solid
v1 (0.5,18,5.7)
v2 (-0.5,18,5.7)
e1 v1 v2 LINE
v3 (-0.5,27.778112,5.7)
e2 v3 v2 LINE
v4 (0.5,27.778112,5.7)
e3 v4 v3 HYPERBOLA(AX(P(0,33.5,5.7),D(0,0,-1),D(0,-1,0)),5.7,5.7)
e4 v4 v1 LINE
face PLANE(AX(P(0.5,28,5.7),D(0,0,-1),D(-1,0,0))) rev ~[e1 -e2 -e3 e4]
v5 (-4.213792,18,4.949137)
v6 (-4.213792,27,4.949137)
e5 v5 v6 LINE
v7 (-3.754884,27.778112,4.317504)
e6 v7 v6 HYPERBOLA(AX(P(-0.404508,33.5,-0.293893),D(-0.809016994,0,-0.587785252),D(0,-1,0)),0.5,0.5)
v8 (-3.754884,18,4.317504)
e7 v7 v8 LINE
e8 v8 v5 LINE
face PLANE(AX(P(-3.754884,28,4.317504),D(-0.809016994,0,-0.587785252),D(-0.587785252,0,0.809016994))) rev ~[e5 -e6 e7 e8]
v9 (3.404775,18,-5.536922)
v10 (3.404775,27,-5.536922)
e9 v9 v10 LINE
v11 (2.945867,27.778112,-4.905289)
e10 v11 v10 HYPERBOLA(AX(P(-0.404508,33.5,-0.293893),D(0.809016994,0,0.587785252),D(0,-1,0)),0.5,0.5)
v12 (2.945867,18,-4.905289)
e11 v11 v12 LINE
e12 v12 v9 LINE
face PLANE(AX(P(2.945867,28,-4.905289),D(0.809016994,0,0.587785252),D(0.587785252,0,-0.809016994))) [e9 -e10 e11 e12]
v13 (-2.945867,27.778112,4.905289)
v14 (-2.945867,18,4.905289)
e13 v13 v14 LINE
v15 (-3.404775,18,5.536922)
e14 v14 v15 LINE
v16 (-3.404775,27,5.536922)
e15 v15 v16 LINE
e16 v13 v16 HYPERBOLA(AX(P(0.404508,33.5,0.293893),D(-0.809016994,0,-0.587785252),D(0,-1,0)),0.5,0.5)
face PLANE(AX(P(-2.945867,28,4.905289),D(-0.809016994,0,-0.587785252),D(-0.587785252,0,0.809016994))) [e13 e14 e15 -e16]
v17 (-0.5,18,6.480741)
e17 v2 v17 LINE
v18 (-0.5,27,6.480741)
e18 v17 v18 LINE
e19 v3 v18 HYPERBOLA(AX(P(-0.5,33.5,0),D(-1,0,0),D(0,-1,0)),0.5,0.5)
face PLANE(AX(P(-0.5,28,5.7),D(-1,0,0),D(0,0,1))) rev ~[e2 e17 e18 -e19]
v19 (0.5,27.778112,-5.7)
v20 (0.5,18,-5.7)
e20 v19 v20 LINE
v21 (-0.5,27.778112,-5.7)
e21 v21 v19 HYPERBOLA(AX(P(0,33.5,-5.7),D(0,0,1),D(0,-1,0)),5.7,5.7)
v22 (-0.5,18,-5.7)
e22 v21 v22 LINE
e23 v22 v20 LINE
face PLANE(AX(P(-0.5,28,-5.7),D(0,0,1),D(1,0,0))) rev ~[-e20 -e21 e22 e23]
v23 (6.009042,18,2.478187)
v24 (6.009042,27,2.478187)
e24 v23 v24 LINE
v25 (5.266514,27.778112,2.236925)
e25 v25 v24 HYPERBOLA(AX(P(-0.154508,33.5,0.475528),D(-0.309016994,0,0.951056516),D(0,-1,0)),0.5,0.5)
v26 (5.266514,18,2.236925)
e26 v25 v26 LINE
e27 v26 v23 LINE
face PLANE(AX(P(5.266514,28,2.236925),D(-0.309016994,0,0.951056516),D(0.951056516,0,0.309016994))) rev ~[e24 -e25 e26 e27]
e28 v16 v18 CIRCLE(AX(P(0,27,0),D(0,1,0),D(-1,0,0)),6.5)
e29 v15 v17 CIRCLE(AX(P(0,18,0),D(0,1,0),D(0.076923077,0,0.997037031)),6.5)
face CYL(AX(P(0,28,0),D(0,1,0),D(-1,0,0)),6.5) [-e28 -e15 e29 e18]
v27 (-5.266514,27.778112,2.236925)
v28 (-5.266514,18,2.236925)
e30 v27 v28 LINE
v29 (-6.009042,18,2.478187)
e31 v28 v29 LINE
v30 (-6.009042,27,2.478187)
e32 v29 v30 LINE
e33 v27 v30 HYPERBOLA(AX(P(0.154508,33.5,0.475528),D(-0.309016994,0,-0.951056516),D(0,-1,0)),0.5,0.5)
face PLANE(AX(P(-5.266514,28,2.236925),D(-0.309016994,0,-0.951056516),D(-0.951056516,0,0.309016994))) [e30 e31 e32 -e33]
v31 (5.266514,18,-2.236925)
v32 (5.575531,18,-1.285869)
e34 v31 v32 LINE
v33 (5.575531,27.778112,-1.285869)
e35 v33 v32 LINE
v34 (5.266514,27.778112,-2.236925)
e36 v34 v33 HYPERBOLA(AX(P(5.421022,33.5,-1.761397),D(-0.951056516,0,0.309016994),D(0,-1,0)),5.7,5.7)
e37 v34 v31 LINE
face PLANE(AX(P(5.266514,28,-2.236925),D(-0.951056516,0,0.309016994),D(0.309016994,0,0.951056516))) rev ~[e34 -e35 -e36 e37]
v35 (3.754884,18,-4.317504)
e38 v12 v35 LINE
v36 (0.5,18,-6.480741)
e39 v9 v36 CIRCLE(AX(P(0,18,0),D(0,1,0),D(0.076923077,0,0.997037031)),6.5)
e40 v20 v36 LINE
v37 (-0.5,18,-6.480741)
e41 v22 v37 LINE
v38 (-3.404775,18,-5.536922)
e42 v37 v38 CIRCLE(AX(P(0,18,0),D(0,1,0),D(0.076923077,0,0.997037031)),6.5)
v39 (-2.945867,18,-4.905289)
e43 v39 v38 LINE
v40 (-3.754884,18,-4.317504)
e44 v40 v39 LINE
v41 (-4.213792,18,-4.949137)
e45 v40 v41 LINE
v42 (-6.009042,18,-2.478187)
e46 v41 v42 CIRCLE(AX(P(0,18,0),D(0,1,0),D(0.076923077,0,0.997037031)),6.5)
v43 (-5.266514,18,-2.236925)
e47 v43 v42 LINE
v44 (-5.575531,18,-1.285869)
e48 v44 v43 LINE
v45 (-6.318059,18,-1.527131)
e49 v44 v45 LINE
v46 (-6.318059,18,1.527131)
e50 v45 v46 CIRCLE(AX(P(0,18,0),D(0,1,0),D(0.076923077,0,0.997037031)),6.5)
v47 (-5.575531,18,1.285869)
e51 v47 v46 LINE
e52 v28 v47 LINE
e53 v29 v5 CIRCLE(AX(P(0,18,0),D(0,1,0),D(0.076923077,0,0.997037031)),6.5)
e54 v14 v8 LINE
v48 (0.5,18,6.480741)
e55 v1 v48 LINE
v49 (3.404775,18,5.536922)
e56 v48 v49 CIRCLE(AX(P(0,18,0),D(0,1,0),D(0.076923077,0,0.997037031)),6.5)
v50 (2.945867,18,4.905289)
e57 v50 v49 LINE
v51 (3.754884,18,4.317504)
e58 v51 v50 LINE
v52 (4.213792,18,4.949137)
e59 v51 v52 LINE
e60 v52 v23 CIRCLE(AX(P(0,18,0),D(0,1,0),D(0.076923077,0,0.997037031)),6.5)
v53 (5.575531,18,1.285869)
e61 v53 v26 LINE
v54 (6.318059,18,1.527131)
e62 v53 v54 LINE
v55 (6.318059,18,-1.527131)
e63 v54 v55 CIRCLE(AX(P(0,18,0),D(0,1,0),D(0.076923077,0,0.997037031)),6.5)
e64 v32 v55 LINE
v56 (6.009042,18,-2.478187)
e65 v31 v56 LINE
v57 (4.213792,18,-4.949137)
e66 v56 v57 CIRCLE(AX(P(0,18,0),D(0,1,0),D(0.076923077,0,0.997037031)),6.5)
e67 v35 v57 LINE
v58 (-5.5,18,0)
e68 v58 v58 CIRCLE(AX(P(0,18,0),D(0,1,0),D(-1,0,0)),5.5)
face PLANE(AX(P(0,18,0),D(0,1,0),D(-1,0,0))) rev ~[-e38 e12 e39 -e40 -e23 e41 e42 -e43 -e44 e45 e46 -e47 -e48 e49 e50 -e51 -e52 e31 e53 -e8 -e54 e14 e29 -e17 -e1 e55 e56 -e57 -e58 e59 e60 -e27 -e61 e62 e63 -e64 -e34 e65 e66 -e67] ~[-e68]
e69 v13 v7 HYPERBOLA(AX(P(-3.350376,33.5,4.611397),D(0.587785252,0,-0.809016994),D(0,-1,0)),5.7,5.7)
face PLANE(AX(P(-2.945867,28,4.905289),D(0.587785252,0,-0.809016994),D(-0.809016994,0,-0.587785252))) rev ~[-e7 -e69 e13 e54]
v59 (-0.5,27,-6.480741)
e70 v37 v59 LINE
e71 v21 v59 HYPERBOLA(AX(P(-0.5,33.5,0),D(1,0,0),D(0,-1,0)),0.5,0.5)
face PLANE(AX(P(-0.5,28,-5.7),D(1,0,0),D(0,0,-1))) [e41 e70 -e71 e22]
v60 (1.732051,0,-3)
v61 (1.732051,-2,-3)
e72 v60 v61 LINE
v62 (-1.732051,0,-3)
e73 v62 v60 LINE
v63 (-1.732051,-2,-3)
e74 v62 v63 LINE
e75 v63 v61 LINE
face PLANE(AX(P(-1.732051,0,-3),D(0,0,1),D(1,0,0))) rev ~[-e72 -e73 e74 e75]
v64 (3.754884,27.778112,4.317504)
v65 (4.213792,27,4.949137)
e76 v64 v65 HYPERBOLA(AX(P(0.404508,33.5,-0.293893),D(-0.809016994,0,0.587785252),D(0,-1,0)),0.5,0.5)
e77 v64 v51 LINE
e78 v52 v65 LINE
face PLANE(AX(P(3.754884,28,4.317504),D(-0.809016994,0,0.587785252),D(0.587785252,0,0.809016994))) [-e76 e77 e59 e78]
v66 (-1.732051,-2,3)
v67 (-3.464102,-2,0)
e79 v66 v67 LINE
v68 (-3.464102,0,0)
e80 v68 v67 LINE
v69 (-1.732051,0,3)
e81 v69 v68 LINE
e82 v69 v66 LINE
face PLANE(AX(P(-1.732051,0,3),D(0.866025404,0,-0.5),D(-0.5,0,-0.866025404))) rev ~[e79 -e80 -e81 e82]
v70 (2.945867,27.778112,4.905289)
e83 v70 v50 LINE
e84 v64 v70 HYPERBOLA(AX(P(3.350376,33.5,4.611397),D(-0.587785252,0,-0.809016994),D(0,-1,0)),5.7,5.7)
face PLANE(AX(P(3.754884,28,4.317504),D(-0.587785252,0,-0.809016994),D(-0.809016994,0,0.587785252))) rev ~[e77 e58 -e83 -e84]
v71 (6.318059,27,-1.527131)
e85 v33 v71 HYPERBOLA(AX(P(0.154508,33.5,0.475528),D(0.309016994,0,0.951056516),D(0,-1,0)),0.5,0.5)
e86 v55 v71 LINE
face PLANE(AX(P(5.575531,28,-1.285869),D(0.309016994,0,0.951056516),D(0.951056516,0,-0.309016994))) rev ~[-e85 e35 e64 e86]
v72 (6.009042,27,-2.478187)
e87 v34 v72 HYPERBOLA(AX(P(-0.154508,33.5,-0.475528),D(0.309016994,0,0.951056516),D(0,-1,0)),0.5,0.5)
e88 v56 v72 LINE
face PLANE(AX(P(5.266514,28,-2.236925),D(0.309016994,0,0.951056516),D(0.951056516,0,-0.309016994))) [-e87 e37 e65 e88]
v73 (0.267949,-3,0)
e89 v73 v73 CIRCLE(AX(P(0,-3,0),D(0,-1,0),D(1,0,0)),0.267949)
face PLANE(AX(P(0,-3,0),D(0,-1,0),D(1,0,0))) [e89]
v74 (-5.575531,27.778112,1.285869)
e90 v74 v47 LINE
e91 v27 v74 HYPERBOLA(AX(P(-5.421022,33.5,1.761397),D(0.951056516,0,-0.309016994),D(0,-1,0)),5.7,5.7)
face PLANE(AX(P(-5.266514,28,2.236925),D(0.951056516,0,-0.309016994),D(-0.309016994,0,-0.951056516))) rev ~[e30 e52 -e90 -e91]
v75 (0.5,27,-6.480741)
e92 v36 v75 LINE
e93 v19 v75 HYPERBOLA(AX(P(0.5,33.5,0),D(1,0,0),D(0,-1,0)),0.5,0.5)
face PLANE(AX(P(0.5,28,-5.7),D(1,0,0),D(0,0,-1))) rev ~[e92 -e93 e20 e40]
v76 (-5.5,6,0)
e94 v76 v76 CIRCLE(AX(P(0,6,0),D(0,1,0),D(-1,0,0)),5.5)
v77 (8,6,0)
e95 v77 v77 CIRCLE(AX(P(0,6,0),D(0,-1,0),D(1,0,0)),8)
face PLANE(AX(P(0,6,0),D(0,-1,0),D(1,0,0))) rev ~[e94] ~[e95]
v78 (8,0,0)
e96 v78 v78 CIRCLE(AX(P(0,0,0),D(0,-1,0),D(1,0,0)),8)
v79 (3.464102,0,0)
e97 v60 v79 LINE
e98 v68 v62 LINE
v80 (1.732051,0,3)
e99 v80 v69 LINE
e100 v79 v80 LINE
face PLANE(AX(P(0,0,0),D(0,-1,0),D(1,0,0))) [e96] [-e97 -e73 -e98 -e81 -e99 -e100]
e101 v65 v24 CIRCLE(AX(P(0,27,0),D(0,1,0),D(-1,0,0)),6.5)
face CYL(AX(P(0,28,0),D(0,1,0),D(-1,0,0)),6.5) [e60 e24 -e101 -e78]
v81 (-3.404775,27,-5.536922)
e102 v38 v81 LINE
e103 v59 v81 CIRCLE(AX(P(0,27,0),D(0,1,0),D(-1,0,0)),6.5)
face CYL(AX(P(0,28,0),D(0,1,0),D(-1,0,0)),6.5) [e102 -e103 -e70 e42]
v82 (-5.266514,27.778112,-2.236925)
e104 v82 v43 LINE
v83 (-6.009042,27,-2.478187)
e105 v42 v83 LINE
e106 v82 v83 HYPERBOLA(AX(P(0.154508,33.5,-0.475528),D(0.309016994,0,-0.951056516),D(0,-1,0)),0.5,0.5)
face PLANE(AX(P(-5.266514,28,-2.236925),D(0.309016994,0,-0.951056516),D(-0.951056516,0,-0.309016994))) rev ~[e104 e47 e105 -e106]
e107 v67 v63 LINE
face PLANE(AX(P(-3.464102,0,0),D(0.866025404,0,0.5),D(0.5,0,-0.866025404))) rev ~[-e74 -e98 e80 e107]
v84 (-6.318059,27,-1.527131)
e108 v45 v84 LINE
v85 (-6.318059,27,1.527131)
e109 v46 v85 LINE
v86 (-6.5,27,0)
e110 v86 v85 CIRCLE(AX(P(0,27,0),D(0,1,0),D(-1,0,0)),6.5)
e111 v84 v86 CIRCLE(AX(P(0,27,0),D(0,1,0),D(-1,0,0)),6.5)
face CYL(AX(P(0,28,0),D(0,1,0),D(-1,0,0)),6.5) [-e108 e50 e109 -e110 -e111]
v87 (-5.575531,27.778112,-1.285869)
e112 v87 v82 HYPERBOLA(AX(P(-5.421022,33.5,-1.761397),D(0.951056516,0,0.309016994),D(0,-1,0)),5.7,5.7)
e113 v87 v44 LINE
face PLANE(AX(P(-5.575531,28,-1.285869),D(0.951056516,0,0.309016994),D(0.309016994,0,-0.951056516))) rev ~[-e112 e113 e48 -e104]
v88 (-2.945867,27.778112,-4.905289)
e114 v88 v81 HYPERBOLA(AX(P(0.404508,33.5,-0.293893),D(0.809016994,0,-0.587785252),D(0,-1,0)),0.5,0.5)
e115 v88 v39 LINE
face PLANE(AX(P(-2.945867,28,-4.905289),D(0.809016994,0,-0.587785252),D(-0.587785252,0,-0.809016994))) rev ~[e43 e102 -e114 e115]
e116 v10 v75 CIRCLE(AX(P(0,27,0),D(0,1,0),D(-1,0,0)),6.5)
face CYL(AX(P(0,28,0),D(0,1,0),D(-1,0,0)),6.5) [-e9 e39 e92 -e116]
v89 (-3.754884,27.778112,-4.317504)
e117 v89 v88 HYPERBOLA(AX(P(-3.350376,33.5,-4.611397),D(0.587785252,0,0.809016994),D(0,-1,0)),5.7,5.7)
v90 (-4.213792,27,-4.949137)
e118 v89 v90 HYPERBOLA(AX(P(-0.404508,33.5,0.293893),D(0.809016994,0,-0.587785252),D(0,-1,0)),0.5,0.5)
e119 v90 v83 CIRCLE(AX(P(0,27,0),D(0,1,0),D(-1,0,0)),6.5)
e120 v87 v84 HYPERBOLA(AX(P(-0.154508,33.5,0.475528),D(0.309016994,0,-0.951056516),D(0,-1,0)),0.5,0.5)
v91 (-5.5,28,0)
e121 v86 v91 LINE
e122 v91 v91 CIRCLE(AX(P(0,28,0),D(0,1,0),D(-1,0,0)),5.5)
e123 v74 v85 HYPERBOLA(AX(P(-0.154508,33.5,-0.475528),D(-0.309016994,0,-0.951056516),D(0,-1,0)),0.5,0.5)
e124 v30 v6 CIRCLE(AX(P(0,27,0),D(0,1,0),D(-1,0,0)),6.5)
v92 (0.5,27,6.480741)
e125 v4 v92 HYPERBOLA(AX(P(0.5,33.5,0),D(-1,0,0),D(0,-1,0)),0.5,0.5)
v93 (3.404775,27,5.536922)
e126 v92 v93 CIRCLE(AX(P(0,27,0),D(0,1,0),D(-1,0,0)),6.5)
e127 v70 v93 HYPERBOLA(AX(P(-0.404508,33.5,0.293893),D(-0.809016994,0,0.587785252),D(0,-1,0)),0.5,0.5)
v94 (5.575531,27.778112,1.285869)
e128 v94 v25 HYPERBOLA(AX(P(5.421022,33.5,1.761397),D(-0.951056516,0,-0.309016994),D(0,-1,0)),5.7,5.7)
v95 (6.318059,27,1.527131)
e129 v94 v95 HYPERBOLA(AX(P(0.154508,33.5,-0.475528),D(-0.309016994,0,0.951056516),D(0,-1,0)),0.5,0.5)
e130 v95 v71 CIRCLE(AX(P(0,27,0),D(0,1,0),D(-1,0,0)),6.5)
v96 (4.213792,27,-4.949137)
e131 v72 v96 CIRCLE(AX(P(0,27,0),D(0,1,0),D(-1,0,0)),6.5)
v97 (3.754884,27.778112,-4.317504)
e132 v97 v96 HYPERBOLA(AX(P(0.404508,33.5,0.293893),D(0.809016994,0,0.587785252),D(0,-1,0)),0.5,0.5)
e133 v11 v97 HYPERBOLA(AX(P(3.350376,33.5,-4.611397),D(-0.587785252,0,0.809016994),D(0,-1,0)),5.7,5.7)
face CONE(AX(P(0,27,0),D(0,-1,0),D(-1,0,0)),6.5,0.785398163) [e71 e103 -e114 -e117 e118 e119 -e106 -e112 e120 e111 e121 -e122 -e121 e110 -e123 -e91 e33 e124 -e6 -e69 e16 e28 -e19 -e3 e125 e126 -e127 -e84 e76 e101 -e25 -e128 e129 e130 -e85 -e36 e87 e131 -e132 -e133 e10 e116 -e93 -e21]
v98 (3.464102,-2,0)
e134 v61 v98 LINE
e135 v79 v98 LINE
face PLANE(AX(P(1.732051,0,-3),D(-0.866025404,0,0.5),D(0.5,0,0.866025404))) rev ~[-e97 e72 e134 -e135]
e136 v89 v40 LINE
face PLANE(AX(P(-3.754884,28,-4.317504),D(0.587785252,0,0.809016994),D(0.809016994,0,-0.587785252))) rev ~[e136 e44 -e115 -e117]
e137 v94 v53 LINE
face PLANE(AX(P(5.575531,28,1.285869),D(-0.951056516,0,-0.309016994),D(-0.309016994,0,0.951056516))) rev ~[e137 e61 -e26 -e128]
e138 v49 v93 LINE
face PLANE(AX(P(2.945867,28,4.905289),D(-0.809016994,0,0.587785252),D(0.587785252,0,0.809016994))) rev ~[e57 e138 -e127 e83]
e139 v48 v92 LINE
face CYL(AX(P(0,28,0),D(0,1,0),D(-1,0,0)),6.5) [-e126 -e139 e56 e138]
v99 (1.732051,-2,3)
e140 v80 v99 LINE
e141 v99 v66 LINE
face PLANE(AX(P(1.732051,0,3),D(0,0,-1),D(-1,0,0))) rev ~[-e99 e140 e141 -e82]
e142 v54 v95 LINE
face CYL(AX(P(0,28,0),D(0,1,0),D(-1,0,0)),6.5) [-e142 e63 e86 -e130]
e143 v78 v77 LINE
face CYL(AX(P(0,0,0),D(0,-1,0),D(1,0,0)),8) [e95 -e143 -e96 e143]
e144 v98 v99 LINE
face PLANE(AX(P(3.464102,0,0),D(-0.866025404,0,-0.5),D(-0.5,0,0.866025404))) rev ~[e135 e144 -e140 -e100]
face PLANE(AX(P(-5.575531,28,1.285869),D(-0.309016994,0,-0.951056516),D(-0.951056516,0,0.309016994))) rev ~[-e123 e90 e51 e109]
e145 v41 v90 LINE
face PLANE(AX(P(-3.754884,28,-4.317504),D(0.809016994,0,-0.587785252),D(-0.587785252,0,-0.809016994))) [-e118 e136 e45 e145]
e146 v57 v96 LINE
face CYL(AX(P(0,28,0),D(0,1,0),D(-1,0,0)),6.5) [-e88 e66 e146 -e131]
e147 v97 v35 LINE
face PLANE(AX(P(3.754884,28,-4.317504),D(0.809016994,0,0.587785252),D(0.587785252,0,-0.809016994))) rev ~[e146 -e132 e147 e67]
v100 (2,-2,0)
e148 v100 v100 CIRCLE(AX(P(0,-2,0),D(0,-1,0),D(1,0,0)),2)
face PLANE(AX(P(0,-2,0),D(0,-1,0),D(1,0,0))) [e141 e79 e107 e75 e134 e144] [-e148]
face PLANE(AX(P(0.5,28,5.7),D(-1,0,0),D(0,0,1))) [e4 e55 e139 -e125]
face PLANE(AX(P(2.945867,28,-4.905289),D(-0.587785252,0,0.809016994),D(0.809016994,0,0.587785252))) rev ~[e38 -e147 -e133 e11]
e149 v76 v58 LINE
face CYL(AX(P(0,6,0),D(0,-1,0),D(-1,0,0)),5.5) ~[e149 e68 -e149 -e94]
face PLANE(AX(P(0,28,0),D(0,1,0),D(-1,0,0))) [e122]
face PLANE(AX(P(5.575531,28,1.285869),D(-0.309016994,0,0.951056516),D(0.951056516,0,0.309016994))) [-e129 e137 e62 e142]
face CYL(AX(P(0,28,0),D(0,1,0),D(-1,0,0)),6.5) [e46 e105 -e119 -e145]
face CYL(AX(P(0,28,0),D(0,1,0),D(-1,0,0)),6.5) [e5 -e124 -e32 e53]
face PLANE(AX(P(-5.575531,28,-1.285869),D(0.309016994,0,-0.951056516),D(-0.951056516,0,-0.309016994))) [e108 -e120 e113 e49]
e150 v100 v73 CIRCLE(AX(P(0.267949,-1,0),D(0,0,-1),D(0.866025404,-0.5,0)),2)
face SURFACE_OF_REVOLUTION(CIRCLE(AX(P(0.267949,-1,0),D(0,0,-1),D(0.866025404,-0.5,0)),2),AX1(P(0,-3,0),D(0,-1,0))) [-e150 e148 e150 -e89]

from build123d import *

# Parameters (mm, degrees)
F0_R             = 8
F1_DEPTH         = 6
F3_DEPTH         = 2
F4_R             = 2
F5_DEPTH         = 1
F7_R             = 5.5
F8_DEPTH         = 22
F9_R             = 6.5
F9_R_2           = 5.5
F10_DEPTH        = 10
F11_SIZE         = 1
F12_W            = 1
F12_H            = 2
F13_DEPTH        = 20
F13_COPIES_COUNT = 10


# Not quite as in the source:
# - a fillet or chamfer that OpenCascade refuses, or shapes differently, is made with other operations: its cross-section is extruded or revolved along the edge and cut away or added
# - a pattern or mirror of a feature is missing from the dataset's text; its kind, count and spacing are read off the source's solid


with BuildPart() as f1:
    # F0 (on Front) → F1 (new body)
    with BuildSketch(Plane.XZ):
        Circle(F0_R)
    extrude(amount=-F1_DEPTH)

    # F2 (on face) → F3 (join)
    with BuildSketch(Plane.XZ):
        Polygon((1.7320508076, 3), (-1.7320508076, 3), (-3.4641016151, 0), (-1.7320508076, -3), (1.7320508076, -3), (3.4641016151, 0), align=None)
    extrude(amount=F3_DEPTH)

    # F4 (on face) → F5 (join)
    with BuildSketch(Plane.XZ.offset(2)):
        Circle(F4_R)
    extrude(amount=F5_DEPTH)

    # F6: fillet of radius 2 on 1 edges, made by hand

    # F6_s1 → F6_t2 (revolve, cut)
    with BuildSketch(Plane.XY):
        with BuildLine():
            ThreePointArc((2, -2), (1.2679491924, -2.7320508076), (0.2679491924, -3))
            Line((0.2679491924, -3), (2, -3))
            Line((2, -3), (2, -2))
        make_face()
    revolve(axis=Axis((0, -3, 0), (0, -1, 0)), mode=Mode.SUBTRACT)

    # F7 (on face) → F8 (join)
    with BuildSketch(Plane(origin=(0, 6, 0), x_dir=(-1, 0, 0), z_dir=(0, 1, 0))):
        Circle(F7_R)
    extrude(amount=F8_DEPTH)

    # F9 (on face) → F10 (join)
    with BuildSketch(Plane(origin=(0, 28, 0), x_dir=(-1, 0, 0), z_dir=(0, 1, 0))):
        Circle(F9_R)
        Circle(F9_R_2, mode=Mode.SUBTRACT)
    extrude(amount=-F10_DEPTH)

    # F11
    f11_edges = [f1.edges().sort_by_distance(p)[0] for p in [
        (6.5, 28, 0),
    ]]
    chamfer(f11_edges, length=F11_SIZE)

    # F12 (on face) → F13 (cut)
    with BuildSketch(Plane(origin=(0, 28, 0), x_dir=(-1, 0, 0), z_dir=(0, 1, 0))):
        with Locations((0, 6.7)):
            Rectangle(F12_W, F12_H)
    f13 = extrude(amount=-F13_DEPTH, mode=Mode.SUBTRACT)

    # F13_copies: F13 ×10 about axis
    f13_copies_axis = Axis((0, 0, 0), (0, 1, 0))
    for i in range(1, F13_COPIES_COUNT):
        add(f13.rotate(f13_copies_axis, i * 360 / F13_COPIES_COUNT), mode=Mode.SUBTRACT)


solid = f1.part
